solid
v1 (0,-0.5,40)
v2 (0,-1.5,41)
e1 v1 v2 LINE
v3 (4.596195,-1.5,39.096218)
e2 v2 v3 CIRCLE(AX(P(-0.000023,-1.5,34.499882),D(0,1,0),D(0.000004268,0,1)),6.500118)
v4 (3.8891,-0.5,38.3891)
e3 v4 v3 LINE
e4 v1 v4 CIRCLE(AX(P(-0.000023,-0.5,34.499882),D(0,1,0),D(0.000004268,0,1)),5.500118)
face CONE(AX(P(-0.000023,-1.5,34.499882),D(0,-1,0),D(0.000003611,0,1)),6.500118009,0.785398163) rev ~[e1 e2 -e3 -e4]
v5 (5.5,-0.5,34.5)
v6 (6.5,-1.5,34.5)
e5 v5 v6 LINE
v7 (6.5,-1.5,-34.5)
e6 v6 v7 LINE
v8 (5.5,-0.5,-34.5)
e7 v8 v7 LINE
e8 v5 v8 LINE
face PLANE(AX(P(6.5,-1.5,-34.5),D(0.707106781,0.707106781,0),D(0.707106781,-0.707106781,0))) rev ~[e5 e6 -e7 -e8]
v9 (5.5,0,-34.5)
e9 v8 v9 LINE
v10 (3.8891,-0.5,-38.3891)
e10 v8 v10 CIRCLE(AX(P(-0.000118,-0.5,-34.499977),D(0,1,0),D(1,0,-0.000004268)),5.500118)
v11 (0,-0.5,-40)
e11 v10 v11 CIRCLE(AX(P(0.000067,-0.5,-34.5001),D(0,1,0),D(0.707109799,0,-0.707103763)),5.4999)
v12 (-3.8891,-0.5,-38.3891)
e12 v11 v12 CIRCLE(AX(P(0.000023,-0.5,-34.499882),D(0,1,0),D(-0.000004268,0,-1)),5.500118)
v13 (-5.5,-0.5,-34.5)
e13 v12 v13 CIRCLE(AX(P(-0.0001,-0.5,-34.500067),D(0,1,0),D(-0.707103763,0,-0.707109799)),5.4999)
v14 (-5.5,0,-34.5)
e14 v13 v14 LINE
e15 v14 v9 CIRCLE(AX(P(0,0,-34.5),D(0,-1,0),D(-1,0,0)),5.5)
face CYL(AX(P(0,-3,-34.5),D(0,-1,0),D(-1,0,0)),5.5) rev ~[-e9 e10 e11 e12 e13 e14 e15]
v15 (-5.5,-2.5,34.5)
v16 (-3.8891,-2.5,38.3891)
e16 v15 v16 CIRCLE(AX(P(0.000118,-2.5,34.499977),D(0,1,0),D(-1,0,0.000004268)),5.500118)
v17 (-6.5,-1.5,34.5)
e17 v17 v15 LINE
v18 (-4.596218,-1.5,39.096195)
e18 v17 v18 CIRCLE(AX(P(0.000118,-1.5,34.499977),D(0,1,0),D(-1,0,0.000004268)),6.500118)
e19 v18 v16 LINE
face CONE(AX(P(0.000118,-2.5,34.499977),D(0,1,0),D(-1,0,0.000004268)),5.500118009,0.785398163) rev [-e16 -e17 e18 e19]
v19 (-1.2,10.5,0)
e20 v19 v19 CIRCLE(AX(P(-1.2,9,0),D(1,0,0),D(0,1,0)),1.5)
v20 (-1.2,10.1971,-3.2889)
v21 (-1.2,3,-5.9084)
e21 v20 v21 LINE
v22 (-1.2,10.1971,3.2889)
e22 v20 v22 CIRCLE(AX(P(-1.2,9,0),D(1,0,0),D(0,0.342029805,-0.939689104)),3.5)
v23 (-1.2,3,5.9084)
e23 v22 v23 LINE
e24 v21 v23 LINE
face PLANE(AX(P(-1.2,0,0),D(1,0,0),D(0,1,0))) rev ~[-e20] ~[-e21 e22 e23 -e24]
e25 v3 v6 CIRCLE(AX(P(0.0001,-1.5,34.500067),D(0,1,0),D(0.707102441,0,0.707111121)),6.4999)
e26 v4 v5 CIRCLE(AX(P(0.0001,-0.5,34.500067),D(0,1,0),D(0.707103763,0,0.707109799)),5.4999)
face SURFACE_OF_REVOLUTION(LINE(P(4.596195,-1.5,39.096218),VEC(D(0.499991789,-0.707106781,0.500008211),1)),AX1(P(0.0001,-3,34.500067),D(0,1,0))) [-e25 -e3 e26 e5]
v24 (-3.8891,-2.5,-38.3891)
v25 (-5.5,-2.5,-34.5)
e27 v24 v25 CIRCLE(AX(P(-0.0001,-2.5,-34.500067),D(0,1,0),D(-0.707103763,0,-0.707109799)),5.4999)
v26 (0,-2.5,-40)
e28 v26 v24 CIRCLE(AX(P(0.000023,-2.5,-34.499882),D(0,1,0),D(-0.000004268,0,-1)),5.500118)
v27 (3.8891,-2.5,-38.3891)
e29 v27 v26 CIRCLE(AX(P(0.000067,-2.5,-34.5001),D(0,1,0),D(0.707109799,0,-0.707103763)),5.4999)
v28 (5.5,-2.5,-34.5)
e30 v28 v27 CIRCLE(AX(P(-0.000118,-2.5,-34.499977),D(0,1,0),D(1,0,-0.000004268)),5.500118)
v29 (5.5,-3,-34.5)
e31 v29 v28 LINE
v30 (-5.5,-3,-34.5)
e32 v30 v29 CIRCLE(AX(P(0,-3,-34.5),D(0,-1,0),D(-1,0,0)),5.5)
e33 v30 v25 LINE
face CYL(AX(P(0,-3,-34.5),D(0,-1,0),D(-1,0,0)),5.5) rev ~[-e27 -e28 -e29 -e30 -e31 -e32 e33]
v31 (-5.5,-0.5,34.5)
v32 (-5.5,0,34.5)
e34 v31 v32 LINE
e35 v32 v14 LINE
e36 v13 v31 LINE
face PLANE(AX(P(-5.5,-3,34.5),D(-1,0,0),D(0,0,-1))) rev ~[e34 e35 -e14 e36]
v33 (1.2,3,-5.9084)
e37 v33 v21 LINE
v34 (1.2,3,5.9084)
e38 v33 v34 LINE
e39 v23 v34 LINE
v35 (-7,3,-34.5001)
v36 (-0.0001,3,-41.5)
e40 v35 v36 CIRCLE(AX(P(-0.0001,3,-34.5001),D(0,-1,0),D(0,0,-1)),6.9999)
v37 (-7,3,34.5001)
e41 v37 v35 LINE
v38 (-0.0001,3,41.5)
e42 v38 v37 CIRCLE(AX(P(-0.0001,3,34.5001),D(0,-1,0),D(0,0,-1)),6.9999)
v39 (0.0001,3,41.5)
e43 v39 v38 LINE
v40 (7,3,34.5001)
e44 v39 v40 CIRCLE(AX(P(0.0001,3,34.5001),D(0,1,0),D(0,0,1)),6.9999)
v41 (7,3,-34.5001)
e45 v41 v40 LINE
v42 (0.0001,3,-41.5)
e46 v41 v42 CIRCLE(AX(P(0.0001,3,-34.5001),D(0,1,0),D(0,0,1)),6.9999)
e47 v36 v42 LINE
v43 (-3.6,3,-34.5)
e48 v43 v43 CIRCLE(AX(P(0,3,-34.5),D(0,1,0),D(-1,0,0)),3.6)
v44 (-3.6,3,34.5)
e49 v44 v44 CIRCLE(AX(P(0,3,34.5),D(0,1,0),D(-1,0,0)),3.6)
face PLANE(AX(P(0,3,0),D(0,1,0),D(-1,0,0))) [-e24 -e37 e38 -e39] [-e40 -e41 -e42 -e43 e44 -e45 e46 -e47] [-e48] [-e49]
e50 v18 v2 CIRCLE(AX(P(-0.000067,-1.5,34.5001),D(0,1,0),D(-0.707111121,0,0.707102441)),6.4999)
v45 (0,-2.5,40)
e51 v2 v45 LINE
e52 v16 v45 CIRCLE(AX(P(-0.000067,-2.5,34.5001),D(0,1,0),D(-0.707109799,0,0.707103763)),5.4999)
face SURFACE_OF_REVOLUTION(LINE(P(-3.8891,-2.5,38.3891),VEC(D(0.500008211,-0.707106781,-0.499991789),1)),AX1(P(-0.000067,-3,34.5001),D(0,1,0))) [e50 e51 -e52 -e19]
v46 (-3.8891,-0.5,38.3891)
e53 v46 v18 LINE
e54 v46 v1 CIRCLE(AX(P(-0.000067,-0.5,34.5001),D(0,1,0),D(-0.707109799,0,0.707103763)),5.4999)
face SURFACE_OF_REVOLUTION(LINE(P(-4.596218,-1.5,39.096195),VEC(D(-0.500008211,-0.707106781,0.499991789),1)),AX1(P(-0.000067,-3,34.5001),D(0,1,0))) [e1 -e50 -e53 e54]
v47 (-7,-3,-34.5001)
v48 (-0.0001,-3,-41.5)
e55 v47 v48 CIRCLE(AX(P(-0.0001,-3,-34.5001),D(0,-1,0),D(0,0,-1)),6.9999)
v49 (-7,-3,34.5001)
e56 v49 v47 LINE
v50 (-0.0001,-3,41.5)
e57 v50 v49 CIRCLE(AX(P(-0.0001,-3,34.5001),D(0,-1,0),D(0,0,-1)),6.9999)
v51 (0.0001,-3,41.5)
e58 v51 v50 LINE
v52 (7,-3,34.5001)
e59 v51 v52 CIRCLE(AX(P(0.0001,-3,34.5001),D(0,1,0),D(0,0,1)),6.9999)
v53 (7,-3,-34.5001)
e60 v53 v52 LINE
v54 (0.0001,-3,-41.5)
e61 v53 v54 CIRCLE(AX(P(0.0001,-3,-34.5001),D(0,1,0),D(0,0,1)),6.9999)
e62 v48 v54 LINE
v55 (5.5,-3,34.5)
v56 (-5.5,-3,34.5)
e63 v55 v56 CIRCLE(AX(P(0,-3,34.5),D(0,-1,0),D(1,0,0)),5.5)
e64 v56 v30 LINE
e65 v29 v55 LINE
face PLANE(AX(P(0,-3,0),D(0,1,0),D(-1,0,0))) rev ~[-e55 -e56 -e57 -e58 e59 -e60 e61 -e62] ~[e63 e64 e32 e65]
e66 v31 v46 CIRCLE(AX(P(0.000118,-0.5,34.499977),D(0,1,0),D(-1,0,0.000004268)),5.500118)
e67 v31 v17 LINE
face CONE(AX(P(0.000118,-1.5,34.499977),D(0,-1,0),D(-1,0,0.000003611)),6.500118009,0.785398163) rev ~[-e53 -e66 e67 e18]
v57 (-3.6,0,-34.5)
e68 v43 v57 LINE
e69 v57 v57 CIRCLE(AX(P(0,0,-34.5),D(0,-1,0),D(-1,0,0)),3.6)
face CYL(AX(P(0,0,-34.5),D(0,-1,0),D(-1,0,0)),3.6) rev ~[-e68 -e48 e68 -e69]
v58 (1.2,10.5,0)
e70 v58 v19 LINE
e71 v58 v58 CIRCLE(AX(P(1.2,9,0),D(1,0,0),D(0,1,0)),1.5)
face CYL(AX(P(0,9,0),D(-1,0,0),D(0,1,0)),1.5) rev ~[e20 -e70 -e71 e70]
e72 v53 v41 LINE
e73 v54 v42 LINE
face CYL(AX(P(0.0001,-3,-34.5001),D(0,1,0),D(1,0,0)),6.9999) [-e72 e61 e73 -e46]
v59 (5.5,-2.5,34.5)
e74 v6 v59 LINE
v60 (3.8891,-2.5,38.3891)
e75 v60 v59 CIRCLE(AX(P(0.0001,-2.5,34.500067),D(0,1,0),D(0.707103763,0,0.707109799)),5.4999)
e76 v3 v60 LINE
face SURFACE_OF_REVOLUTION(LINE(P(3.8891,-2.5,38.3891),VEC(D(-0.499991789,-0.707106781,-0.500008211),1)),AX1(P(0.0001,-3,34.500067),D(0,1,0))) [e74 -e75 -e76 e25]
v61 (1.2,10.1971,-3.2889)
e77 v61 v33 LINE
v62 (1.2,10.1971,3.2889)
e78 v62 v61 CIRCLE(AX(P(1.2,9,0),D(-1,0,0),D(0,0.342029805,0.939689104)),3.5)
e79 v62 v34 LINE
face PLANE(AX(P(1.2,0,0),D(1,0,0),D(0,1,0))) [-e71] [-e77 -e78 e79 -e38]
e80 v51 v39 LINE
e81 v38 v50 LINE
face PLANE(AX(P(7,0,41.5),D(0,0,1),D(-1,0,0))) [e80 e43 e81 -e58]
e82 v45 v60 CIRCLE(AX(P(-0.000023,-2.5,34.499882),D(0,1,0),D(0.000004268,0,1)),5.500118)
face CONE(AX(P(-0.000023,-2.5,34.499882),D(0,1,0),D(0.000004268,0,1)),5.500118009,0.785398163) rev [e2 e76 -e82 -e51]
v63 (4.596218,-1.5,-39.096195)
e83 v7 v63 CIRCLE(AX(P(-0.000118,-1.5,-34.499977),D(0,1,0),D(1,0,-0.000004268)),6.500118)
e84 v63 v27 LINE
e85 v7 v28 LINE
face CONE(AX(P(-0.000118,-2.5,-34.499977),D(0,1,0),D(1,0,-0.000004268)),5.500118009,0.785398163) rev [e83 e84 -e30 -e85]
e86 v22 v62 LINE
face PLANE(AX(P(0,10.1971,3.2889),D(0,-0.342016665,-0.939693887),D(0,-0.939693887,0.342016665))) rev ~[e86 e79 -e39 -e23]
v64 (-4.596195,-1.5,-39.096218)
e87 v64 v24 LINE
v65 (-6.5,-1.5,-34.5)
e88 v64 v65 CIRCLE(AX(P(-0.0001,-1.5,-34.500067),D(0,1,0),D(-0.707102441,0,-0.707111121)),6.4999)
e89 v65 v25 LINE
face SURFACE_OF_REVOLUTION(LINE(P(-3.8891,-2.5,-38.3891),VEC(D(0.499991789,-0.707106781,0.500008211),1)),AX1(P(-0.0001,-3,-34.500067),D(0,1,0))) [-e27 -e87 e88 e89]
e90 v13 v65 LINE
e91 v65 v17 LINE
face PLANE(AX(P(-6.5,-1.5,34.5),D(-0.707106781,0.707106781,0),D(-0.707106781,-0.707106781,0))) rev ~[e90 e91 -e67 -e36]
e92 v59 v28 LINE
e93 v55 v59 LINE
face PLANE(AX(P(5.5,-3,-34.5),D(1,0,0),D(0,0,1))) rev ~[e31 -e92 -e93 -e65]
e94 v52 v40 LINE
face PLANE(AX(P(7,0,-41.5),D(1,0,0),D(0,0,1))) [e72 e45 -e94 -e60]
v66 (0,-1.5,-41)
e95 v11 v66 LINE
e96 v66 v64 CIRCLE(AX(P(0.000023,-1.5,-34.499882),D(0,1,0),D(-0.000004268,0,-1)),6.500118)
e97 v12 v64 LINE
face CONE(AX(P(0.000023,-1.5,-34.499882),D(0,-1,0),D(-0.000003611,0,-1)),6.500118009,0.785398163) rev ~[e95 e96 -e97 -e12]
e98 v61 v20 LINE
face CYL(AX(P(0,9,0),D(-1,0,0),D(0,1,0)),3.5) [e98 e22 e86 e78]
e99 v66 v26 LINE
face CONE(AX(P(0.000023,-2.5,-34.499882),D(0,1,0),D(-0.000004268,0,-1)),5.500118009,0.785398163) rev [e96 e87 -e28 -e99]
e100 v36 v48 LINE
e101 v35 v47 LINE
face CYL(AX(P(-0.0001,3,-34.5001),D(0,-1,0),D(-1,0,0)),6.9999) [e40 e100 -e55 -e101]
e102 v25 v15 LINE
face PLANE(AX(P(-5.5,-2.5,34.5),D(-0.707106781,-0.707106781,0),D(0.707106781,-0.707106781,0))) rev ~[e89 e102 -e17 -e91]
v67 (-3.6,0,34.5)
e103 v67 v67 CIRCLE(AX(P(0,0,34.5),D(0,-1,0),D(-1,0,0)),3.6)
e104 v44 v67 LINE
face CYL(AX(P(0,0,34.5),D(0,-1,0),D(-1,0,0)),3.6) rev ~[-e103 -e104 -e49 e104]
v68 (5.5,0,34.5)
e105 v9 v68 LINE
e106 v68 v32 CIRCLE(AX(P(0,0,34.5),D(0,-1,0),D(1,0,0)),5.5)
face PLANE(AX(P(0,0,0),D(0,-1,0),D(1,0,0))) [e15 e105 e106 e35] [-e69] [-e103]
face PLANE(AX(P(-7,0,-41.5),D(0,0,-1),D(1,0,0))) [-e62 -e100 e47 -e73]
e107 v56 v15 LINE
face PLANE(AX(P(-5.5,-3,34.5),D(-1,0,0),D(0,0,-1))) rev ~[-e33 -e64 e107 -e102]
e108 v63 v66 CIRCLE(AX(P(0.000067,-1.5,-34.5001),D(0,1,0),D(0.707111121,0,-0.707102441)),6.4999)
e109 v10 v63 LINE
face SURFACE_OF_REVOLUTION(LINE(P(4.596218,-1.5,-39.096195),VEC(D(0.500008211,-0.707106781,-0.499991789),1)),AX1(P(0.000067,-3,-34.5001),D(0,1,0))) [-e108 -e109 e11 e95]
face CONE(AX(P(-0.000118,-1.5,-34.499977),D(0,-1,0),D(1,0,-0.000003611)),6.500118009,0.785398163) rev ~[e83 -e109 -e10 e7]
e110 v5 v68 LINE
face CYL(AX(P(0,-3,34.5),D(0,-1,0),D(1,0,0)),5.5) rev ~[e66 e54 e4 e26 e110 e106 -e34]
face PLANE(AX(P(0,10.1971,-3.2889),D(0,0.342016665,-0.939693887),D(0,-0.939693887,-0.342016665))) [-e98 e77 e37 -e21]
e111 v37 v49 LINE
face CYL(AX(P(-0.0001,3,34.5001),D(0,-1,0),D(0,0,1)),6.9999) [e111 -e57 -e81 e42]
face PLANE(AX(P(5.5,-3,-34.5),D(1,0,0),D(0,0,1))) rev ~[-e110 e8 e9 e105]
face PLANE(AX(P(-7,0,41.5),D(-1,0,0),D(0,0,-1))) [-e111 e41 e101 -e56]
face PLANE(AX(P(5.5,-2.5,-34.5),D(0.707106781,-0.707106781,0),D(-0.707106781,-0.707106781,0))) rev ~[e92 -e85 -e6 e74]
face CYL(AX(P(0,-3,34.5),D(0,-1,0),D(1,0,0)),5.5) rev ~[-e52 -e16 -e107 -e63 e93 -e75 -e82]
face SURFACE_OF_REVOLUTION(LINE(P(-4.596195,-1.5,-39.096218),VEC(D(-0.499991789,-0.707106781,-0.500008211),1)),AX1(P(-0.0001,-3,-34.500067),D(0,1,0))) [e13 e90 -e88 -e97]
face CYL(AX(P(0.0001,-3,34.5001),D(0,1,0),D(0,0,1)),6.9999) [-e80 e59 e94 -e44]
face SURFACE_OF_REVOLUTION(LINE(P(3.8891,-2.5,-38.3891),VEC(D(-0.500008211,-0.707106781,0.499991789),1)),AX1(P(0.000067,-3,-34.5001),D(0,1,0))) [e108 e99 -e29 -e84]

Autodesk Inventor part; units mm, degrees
ref_plane "YZ Plane" through (0, 0, 0) normal (1, 0, 0) x (0, 1, 0)
ref_plane "XZ Plane" through (0, 0, 0) normal (0, 1, 0) x (-1, 0, 0)
ref_plane "XY Plane" through (0, 0, 0) normal (0, 0, 1) x (1, 0, 0)
sketch "Sketch1" plane through (0, 0, 0) normal (0, 1, 0) x (-1, 0, 0)
  line L0 (-7, 41.5) -> (7, 41.5)
  line L1 (7, 41.5) -> (7, -41.5)
  line L2 (7, -41.5) -> (-7, -41.5)
  line L3 (-7, -41.5) -> (-7, 41.5)
  line L4 (-7, 41.5) -> (7, -41.5) construction
  line L5 (7, 41.5) -> (-7, -41.5) construction
  circle A0 centre (0, 34.5) radius 3.6
  circle A1 centre (0, -34.5) radius 3.6
  line L6 (13.7936, 0) -> (-15.5073, 0) construction
  point P0 (0, 0)
  dimension "d0" = 7.2
  dimension "d1" = 69
  dimension "d2" = 83
  dimension "d3" = 14
extrude "Extrusion1" add sketch "Sketch1" along normal mid plane 6
sketch "Sketch2" plane through (0, 0, 0) normal (1, 0, 0) x (0, 1, 0)
  circle A0 centre (9, 0) radius 3.5
  line L0 (10.1971, -3.2889) -> (3, -5.9084)
  line L1 (3, -41.5) -> (3, 41.5) projected
  line L2 (10.1971, 3.2889) -> (3, 5.9084)
  line L3 (9, 0) -> (-7.9221, 0) construction
  circle A1 centre (9, 0) radius 1.5
  point P0 (0, 0)
  point P1 (16.3025, 1.2439)
  point P2 (5, 7.6173)
  point P3 (5, -5.09)
  point P4 (3, 0)
  dimension "d6" = 7
  dimension "d11" = 20
  dimension "d12" = 6
  dimension "d13" = 3
extrude "Extrusion2" add sketch "Sketch2" along normal mid plane 2.4
fillet "Fillet1" radius 7 4 edges at (-7, 0, 41.5) (7, 0, 41.5) (-7, 0, -41.5) (7, 0, -41.5)
sketch "Sketch5" plane through (0, -3, 0) normal (0, -1, 0) x (1, 0, 0)
  arc A0 (-7, -34.5) -> (7, -34.5) centre (0, -34.5) ccw projected
  arc A1 (-7, -34.5) -> (7, -34.5) centre (0, -34.5) ccw projected
  line L0 (7, -34.5) -> (7, 34.5) projected
  arc A2 (7, 34.5) -> (-7, 34.5) centre (0, 34.5) ccw projected
  line L1 (-7, 34.5) -> (-7, -34.5) projected
  circle A3 centre (0, 34.5) radius 3.6 projected
  circle A4 centre (0, -34.5) radius 3.6 projected
  arc A5 (-5.5, -34.5) -> (5.5, -34.5) centre (0, -34.5) ccw
  line L2 (5.5, -34.5) -> (5.5, 34.5)
  arc A6 (5.5, 34.5) -> (-5.5, 34.5) centre (0, 34.5) ccw
  line L3 (-5.5, 34.5) -> (-5.5, -34.5)
  point P0 (0, 0)
  dimension "d32" = 1.5
extrude "Extrusion5" cut sketch "Sketch5" against normal blind 3 contours L3 A6 L2 A5
sketch "Sketch7" plane through (0, 0, 0) normal (0, 0, 1) x (1, 0, 0)
  point P0 (0, 0)
sketch "Sketch8" plane through (0, 0, 0) normal (0, 0, 1) x (1, 0, 0)
  line L0 (-5.5, -2.5) -> (-6.5, -1.5)
  line L1 (-6.5, -1.5) -> (-5.5, -0.5)
  line L2 (-6.5, -1.5) -> (-5.5, -1.5) construction
  line L3 (-5.5, -3) -> (-5.5, 0) projected
  point P0 (0, 0)
  dimension "d38" = 1
  dimension "d39" = 45
  dimension "d42" = 0.5
sketch3d "3D Sketch1"
  arc A0 (5.5, -3, -34.5) -> (3.8891, -3, -38.3891) centre (0, -3, -34.5) ccw
  arc A1 (3.8891, -3, -38.3891) -> (0, -3, -40) centre (0, -3, -34.5) ccw
  arc A2 (0, -3, -40) -> (-3.8891, -3, -38.3891) centre (0, -3, -34.5) ccw
  arc A3 (-3.8891, -3, -38.3891) -> (-5.5, -3, -34.5) centre (0, -3, -34.5) ccw
  line L0 (5.5, -3, -34.5) -> (5.5, -3, 34.5)
  arc A4 (-5.5, -3, 34.5) -> (-3.8891, -3, 38.3891) centre (0, -3, 34.5) ccw
  arc A5 (-3.8891, -3, 38.3891) -> (0, -3, 40) centre (0, -3, 34.5) ccw
  arc A6 (0, -3, 40) -> (3.8891, -3, 38.3891) centre (0, -3, 34.5) ccw
  arc A7 (3.8891, -3, 38.3891) -> (5.5, -3, 34.5) centre (0, -3, 34.5) ccw
  line L1 (-5.5, -3, 34.5) -> (-5.5, -3, -34.5)
sweep "Sweep1" cut profiles "Sketch8" path "3D Sketch1"
equation "\"d10\" = 0.5 * d3"
properties part number "Gripper_arms"
